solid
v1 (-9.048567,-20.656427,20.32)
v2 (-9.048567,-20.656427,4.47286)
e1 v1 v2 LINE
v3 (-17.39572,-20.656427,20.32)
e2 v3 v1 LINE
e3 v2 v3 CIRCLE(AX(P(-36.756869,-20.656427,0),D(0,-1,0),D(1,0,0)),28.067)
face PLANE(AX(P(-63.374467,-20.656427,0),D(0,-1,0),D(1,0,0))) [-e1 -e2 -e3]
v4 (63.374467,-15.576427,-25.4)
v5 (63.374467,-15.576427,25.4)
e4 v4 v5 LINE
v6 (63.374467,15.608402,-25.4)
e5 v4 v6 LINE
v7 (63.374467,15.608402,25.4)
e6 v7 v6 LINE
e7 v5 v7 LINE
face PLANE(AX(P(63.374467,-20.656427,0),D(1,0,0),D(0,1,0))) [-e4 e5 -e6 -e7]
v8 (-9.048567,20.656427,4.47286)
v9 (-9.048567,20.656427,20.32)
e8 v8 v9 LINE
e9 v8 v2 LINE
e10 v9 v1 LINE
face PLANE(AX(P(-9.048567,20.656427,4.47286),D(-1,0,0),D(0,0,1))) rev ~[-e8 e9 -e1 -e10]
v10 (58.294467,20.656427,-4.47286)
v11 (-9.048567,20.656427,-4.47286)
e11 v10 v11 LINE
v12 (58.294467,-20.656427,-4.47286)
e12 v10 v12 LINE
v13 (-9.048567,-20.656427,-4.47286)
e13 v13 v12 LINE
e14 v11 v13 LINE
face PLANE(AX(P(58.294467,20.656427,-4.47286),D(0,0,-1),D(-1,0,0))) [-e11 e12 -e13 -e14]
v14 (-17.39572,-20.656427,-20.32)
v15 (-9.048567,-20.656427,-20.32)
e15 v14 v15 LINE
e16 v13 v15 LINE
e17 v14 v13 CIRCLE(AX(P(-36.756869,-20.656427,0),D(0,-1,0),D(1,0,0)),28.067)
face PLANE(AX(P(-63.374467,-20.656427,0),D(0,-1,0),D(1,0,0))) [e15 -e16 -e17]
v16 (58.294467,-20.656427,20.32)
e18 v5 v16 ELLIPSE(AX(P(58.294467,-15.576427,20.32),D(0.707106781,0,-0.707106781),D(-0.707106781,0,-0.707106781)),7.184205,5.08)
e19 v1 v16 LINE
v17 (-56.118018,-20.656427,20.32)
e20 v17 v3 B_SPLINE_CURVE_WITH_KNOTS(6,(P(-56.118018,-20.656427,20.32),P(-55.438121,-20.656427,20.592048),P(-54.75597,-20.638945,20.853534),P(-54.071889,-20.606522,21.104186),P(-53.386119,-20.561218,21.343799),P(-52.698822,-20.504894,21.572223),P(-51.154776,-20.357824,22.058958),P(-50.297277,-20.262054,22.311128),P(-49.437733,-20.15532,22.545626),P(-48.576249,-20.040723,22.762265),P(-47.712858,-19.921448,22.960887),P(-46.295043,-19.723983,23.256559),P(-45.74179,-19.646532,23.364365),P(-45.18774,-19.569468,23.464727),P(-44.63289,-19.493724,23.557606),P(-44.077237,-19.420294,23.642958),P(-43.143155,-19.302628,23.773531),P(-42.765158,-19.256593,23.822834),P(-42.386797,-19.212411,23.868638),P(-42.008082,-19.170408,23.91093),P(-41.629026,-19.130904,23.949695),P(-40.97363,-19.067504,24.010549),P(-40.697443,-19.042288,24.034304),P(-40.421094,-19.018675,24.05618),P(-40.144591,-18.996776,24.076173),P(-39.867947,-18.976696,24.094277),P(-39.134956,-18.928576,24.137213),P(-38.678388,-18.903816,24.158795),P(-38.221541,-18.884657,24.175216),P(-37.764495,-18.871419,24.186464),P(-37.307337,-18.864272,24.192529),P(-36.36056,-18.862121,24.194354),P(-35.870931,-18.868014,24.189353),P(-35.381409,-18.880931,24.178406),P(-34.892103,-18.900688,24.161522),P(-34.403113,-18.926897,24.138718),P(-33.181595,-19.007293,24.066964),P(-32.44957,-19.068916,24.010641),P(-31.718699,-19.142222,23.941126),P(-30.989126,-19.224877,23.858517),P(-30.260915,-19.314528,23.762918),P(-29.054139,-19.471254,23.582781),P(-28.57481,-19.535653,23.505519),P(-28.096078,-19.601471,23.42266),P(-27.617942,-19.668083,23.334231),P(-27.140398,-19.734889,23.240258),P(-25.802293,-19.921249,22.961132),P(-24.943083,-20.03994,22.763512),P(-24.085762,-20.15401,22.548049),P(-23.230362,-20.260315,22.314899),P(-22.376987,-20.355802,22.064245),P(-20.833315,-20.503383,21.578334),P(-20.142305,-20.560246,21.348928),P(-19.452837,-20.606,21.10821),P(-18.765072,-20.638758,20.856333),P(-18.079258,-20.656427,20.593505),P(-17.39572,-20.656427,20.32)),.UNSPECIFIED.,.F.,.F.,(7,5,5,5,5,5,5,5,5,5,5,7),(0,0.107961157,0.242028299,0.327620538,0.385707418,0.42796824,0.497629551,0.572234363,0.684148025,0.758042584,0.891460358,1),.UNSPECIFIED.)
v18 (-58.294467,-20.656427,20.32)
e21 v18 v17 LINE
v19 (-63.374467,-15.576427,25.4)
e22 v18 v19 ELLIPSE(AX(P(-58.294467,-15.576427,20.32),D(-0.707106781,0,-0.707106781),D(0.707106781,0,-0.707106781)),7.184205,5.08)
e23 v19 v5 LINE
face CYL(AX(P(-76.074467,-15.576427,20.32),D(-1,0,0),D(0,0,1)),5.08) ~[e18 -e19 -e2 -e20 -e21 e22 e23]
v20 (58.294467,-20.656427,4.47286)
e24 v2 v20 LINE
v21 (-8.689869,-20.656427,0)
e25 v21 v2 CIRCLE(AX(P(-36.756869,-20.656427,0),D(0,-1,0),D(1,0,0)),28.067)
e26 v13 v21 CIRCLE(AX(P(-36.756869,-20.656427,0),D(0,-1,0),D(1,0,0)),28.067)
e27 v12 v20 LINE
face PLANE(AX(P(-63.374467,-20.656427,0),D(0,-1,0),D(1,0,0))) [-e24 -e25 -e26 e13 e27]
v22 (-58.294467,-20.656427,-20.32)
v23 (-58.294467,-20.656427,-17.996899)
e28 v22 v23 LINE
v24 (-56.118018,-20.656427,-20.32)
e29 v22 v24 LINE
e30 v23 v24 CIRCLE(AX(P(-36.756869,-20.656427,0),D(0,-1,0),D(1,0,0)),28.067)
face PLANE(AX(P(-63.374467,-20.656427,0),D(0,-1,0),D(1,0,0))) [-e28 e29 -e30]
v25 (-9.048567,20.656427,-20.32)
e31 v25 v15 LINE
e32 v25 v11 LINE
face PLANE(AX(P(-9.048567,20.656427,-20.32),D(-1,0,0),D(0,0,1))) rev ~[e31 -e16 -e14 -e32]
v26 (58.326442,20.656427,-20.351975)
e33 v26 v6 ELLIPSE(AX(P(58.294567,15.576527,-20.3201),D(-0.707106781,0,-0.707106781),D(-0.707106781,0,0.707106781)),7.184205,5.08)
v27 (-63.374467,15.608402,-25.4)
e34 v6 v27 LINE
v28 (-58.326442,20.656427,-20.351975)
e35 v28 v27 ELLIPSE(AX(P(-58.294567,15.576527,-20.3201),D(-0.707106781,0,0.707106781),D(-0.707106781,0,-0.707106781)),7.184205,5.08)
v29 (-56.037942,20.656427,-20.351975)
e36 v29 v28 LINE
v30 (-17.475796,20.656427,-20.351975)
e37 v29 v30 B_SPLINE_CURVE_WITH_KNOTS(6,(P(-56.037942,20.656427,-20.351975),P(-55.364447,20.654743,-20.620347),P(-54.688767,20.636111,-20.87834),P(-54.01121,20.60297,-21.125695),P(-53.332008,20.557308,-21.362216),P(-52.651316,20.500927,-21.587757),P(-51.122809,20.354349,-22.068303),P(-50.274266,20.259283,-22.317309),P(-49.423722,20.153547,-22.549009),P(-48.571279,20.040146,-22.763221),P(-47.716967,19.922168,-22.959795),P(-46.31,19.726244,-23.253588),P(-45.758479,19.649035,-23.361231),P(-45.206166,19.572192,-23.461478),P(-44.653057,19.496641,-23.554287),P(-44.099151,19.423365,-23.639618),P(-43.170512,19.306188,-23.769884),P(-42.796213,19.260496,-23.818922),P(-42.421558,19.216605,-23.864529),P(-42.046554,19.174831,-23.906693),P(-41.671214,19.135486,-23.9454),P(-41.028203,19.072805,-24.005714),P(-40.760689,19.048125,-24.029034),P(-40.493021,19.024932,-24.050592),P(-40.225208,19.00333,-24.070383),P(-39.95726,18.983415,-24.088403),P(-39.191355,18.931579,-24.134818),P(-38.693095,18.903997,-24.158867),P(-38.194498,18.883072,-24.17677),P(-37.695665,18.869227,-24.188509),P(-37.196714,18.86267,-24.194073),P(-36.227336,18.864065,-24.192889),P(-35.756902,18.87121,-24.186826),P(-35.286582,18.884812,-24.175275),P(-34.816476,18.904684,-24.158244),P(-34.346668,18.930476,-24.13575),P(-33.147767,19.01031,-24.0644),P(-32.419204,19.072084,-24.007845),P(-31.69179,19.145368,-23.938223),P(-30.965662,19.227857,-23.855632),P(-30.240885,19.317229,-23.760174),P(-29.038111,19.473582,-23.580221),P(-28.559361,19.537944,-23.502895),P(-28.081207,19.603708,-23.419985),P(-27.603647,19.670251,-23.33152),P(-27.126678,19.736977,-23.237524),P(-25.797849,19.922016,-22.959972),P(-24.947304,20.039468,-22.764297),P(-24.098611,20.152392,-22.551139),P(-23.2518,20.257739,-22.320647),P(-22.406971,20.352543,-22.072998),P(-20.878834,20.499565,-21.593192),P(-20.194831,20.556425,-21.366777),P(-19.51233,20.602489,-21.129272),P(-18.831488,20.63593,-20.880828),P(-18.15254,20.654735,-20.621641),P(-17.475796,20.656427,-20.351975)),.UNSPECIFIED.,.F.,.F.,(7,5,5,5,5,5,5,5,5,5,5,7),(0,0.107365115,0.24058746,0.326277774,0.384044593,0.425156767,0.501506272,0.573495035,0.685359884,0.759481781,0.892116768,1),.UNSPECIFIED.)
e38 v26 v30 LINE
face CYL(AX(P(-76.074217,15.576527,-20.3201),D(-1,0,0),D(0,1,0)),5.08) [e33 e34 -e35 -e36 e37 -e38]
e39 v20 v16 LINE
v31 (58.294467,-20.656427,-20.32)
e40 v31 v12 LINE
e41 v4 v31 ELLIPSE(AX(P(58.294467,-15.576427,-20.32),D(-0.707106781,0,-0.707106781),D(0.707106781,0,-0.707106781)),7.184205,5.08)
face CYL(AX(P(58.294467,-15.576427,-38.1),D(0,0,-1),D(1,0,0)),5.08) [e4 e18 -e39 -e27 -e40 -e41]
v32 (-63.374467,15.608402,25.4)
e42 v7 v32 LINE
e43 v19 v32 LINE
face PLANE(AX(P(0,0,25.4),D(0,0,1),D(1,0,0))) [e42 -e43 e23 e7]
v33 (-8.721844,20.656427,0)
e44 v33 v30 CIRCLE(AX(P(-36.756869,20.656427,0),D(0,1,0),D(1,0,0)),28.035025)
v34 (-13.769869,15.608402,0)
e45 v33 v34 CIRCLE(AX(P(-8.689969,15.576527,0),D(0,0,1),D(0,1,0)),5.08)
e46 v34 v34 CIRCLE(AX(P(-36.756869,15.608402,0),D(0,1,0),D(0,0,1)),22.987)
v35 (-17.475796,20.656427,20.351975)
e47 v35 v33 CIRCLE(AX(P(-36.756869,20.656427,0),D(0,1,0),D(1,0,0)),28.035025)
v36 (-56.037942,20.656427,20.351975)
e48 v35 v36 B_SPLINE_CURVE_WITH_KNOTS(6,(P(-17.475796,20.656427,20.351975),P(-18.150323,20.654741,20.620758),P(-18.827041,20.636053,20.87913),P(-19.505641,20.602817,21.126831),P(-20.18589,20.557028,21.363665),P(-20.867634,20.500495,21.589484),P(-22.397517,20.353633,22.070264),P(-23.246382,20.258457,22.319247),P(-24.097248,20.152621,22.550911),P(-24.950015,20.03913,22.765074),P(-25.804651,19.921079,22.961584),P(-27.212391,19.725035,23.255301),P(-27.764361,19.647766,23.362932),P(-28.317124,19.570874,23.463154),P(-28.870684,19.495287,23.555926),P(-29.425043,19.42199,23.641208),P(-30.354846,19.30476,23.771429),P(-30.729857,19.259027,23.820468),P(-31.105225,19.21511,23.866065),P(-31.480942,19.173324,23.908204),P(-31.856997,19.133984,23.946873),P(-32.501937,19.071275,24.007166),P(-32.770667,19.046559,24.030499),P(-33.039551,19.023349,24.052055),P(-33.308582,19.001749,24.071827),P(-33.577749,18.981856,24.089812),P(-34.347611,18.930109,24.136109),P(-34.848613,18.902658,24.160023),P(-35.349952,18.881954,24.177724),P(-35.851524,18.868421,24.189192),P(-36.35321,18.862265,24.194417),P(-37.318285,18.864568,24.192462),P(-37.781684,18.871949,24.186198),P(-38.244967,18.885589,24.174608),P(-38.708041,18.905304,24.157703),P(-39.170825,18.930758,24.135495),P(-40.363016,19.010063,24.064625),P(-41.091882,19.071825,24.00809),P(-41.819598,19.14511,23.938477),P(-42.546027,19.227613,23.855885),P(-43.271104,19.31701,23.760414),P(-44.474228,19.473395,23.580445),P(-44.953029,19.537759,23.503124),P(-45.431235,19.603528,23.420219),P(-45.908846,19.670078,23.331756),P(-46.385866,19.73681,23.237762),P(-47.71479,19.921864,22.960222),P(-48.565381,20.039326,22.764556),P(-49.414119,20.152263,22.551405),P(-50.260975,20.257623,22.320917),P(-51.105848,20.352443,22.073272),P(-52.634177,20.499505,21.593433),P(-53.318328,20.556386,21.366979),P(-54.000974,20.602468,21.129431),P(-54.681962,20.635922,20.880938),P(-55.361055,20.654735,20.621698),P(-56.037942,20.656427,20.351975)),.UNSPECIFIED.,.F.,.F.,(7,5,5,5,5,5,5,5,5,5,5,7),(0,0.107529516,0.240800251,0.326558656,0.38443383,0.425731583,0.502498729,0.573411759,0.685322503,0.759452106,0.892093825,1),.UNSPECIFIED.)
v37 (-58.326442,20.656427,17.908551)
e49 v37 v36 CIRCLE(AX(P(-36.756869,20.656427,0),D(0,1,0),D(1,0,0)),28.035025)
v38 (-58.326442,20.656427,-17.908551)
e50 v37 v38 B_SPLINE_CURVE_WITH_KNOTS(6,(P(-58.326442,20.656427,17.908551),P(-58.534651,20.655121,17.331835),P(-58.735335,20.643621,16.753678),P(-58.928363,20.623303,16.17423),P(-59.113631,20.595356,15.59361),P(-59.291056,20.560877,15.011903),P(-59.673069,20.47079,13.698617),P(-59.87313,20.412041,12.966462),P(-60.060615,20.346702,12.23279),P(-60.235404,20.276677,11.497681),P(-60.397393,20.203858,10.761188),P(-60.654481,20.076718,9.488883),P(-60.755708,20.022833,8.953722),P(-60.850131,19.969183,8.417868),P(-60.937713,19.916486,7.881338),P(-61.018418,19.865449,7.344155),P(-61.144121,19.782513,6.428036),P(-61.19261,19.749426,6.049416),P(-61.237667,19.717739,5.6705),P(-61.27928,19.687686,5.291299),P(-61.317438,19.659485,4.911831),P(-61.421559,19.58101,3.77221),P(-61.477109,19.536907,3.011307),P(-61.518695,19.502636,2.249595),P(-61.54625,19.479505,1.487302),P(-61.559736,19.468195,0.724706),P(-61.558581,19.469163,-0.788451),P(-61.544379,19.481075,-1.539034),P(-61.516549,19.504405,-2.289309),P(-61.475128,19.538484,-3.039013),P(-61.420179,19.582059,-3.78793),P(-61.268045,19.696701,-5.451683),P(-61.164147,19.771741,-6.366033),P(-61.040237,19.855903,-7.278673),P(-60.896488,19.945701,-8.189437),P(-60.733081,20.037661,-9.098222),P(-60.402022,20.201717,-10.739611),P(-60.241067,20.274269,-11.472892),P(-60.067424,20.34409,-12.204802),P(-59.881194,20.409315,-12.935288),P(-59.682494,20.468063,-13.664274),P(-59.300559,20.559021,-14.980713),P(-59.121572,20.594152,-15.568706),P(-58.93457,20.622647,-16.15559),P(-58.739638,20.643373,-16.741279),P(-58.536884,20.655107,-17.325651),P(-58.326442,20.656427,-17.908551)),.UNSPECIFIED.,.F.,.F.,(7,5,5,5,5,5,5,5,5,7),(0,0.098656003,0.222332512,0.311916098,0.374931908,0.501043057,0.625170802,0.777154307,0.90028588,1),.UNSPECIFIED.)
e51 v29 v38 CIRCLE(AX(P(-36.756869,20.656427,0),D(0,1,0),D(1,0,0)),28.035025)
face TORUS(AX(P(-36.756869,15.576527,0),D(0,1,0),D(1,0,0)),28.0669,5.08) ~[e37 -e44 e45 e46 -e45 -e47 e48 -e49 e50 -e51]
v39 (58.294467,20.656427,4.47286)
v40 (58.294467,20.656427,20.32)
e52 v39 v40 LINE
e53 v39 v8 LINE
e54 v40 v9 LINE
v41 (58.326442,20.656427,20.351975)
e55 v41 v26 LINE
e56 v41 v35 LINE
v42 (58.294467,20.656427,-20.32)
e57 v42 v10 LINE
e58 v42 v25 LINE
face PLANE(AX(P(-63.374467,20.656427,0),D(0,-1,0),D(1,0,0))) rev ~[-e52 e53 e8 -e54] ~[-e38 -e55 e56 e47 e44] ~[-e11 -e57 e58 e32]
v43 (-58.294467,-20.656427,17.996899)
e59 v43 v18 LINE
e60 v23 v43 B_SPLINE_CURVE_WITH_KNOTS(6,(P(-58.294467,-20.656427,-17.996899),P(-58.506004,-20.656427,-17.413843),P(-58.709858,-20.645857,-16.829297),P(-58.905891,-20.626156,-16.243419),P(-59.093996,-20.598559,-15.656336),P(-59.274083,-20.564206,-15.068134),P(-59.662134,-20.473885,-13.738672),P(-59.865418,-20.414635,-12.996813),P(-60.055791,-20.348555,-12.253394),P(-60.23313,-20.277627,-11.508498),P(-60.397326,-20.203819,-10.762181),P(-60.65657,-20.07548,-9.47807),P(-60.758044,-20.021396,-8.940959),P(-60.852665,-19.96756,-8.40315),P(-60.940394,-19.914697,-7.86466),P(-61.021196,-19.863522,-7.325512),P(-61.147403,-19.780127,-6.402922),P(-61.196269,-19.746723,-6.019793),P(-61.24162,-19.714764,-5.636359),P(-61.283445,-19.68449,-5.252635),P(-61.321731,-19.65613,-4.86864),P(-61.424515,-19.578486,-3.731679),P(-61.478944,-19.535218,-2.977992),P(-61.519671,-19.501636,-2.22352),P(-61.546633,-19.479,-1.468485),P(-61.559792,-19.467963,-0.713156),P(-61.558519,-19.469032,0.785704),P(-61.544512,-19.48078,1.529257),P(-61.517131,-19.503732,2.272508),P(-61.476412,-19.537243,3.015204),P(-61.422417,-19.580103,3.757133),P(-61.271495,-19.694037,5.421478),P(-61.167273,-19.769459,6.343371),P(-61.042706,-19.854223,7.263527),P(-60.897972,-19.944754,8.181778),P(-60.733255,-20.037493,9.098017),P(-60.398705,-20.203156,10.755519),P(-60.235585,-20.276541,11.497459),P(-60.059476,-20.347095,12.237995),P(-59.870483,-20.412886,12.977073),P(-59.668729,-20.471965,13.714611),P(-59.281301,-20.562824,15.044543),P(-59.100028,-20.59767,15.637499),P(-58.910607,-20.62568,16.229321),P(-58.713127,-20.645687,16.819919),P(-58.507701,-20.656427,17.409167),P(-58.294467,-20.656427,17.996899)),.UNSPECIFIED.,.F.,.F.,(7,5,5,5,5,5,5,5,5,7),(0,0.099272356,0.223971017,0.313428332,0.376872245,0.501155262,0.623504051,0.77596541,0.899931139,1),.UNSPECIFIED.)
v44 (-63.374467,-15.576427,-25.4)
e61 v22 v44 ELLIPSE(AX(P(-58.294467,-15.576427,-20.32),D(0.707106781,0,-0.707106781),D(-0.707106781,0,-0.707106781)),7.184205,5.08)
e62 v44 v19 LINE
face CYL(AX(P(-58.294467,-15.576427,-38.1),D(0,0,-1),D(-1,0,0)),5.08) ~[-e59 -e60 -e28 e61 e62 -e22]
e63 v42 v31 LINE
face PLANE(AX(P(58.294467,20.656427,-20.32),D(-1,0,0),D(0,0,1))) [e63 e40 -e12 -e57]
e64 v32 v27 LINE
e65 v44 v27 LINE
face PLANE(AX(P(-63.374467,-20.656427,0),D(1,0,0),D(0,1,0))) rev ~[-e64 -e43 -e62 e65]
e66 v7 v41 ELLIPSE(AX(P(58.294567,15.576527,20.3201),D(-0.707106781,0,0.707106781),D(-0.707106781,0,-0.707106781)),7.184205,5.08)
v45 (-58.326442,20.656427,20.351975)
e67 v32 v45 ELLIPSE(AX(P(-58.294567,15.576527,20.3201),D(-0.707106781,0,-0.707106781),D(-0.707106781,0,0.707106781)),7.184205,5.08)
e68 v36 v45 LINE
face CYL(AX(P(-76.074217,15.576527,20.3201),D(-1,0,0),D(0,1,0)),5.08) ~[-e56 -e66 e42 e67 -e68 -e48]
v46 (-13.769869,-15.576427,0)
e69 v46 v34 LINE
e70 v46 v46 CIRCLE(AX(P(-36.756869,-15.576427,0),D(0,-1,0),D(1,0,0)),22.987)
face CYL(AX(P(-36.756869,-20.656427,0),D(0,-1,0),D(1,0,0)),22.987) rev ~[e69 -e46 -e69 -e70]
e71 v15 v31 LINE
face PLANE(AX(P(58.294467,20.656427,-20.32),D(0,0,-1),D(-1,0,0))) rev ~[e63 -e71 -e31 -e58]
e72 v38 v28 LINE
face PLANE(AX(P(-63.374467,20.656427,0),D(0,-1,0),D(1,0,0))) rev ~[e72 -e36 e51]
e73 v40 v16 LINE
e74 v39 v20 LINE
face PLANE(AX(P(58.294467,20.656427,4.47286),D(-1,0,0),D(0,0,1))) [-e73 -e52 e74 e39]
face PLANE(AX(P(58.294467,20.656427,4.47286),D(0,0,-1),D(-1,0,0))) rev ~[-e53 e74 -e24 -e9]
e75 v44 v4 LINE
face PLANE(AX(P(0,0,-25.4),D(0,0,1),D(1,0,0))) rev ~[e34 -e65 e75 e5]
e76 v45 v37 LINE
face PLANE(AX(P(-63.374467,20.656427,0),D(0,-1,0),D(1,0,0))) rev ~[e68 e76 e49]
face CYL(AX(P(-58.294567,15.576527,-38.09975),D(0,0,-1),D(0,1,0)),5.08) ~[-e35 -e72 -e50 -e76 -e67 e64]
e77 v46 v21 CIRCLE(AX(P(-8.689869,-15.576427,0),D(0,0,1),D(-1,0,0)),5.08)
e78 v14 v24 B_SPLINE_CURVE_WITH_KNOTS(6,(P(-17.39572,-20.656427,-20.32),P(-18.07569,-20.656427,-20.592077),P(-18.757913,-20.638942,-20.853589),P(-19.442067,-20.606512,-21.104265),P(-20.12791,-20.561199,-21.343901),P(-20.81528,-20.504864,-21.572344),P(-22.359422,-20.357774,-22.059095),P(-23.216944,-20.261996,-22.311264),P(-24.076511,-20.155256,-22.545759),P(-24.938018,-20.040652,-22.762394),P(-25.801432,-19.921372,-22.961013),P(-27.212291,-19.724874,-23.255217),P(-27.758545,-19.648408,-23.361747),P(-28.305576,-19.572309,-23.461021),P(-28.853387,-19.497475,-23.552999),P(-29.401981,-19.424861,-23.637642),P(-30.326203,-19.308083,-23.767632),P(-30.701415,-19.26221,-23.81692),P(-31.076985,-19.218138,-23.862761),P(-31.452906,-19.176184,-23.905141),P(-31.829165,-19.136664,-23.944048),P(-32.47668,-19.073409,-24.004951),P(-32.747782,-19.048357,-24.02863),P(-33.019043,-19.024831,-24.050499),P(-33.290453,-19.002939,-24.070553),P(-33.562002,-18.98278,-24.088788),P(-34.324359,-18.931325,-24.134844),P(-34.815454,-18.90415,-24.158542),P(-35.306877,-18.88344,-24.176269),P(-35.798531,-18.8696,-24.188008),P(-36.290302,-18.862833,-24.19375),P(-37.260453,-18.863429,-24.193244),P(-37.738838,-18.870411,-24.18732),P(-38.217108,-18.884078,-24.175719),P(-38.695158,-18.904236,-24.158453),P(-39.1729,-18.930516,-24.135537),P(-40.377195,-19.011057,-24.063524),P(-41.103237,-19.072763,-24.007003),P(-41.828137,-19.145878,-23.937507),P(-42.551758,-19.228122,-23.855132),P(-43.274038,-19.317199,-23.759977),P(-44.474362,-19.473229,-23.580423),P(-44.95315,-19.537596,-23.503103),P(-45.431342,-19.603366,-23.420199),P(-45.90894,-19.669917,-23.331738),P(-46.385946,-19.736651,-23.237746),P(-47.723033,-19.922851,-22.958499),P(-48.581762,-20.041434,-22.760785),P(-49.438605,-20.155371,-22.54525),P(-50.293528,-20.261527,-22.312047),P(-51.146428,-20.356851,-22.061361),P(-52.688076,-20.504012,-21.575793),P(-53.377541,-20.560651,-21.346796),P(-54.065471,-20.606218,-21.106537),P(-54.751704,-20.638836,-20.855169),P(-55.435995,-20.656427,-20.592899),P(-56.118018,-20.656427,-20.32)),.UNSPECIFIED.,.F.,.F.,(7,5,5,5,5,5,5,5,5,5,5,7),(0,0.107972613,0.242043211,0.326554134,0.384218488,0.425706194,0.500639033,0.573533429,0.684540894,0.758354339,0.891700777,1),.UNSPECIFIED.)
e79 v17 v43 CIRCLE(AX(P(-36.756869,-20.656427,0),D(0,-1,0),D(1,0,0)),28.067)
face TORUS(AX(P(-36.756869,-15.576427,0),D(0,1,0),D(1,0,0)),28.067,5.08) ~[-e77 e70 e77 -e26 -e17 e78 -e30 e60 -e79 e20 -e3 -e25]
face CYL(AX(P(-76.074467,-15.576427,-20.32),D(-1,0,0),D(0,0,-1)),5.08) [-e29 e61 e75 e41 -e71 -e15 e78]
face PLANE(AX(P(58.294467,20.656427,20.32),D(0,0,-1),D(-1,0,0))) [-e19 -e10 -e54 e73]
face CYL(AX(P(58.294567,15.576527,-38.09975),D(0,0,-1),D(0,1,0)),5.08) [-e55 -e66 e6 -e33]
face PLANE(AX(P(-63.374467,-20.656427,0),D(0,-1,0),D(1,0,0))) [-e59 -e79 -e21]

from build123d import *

# Parameters (mm, degrees)
F0_W        = 126.7489343882
F0_H        = 41.312854737
F1_DEPTH    = 25.4
F2_R        = 22.987
F3_DEPTH    = 41.313854737
F4_T1_DEPTH = 76.2
F4_T3_DEPTH = 152.1489343882
F5_T1_DEPTH = 152.1484343931
F5_T3_DEPTH = 76.1995000049
F6_W        = 67.343034428
F6_H        = 15.8471396435
F7_DEPTH    = 41.313854837


# Not quite as in the source:
# - a fillet or chamfer that OpenCascade refuses, or shapes differently, is made with other operations: its cross-section is extruded or revolved along the edge and cut away or added


with BuildPart() as f1:
    # F0 (on Top) → F1 (new body, symmetric)
    with BuildSketch(Plane.XY):
        Rectangle(F0_W, F0_H)
    extrude(amount=F1_DEPTH, both=True)

    # F2 (on face) → F3 (cut, through all)
    with BuildSketch(Plane.XZ.offset(20.6564273685)):
        with Locations((-36.7568694055, 0)):
            Circle(F2_R)
    extrude(amount=-F3_DEPTH, mode=Mode.SUBTRACT)

    # F4: fillet of radius 5.08 on 5 edges, made by hand

    # F4_s2 → F4_t1 (cut)
    with BuildSketch(Plane.XY.offset(-38.1)):
        with BuildLine():
            ThreePointArc((-63.3744671941, -15.5764273685), (-61.8865696425, -19.1685298169), (-58.2944671941, -20.6564273685))
            Line((-58.2944671941, -20.6564273685), (-63.3744671941, -20.6564273685))
            Line((-63.3744671941, -20.6564273685), (-63.3744671941, -15.5764273685))
        make_face()
        with BuildLine():
            ThreePointArc((63.3744671941, -15.5764273685), (61.8865696425, -19.1685298169), (58.2944671941, -20.6564273685))
            Line((58.2944671941, -20.6564273685), (63.3744671941, -20.6564273685))
            Line((63.3744671941, -20.6564273685), (63.3744671941, -15.5764273685))
        make_face()
    extrude(amount=F4_T1_DEPTH, mode=Mode.SUBTRACT)

    # F4_s4 → F4_t3 (cut)
    with BuildSketch(Plane.YZ.offset(-76.0744671941)):
        with BuildLine():
            ThreePointArc((-15.5764273685, -25.4), (-19.1685298169, -23.9121024484), (-20.6564273685, -20.32))
            Line((-20.6564273685, -20.32), (-20.6564273685, -25.4))
            Line((-20.6564273685, -25.4), (-15.5764273685, -25.4))
        make_face()
        with BuildLine():
            ThreePointArc((-15.5764273685, 25.4), (-19.1685298169, 23.9121024484), (-20.6564273685, 20.32))
            Line((-20.6564273685, 20.32), (-20.6564273685, 25.4))
            Line((-20.6564273685, 25.4), (-15.5764273685, 25.4))
        make_face()
    extrude(amount=F4_T3_DEPTH, mode=Mode.SUBTRACT)

    # F4_s5 → F4_t6 (revolve, cut)
    with BuildSketch(Plane.XY):
        with BuildLine():
            ThreePointArc((-13.7698694055, -15.5764273685), (-12.2819718539, -19.1685298169), (-8.6898694055, -20.6564273685))
            Line((-8.6898694055, -20.6564273685), (-13.7698694055, -20.6564273685))
            Line((-13.7698694055, -20.6564273685), (-13.7698694055, -15.5764273685))
        make_face()
    revolve(axis=Axis((-36.7568694055, -20.6564273685, 0), (0, -1, 0)), mode=Mode.SUBTRACT)

    # F5: fillet of radius 5.08 on 5 edges, made by hand

    # F5_s2 → F5_t1 (cut)
    with BuildSketch(Plane.YZ.offset(-76.0742171965)):
        with BuildLine():
            ThreePointArc((20.6565273685, -20.3201), (19.1686298169, -23.9122024484), (15.5765273685, -25.4001))
            Line((15.5765273685, -25.4001), (15.5765273685, -25.5017))
            ThreePointArc((15.5765273685, -25.5017), (18.1164773685, -25.5016), (20.6564273685, -25.5016))
            Line((20.6564273685, -25.5016), (20.7580273685, -25.4))
            ThreePointArc((20.7580273685, -25.4), (20.7580273685, -22.86005), (20.7581273685, -20.3201))
            Line((20.7581273685, -20.3201), (20.6565273685, -20.3201))
        make_face()
        with BuildLine():
            ThreePointArc((20.6565273685, 20.3201), (19.1686298169, 23.9122024484), (15.5765273685, 25.4001))
            Line((15.5765273685, 25.4001), (15.5765273685, 25.5017))
            ThreePointArc((15.5765273685, 25.5017), (18.1164773685, 25.5016), (20.6564273685, 25.5016))
            Line((20.6564273685, 25.5016), (20.7580273685, 25.4))
            ThreePointArc((20.7580273685, 25.4), (20.7580273685, 22.86005), (20.7581273685, 20.3201))
            Line((20.7581273685, 20.3201), (20.6565273685, 20.3201))
        make_face()
    extrude(amount=F5_T1_DEPTH, mode=Mode.SUBTRACT)

    # F5_s4 → F5_t3 (cut)
    with BuildSketch(Plane.XY.offset(-38.0997500025)):
        with BuildLine():
            ThreePointArc((58.2945671941, 20.6565273685), (61.8866696425, 19.1686298169), (63.3745671941, 15.5765273685))
            Line((63.3745671941, 15.5765273685), (63.4761671941, 15.5765273685))
            ThreePointArc((63.4761671941, 15.5765273685), (63.4760671941, 18.1164773685), (63.4760671941, 20.6564273685))
            Line((63.4760671941, 20.6564273685), (63.3744671941, 20.7580273685))
            ThreePointArc((63.3744671941, 20.7580273685), (60.8345171941, 20.7580273685), (58.2945671941, 20.7581273685))
            Line((58.2945671941, 20.7581273685), (58.2945671941, 20.6565273685))
        make_face()
        with BuildLine():
            ThreePointArc((-58.2945671941, 20.6565273685), (-61.8866696425, 19.1686298169), (-63.3745671941, 15.5765273685))
            Line((-63.3745671941, 15.5765273685), (-63.4761671941, 15.5765273685))
            ThreePointArc((-63.4761671941, 15.5765273685), (-63.4760671941, 18.1164773685), (-63.4760671941, 20.6564273685))
            Line((-63.4760671941, 20.6564273685), (-63.3744671941, 20.7580273685))
            ThreePointArc((-63.3744671941, 20.7580273685), (-60.8345171941, 20.7580273685), (-58.2945671941, 20.7581273685))
            Line((-58.2945671941, 20.7581273685), (-58.2945671941, 20.6565273685))
        make_face()
    extrude(amount=F5_T3_DEPTH, mode=Mode.SUBTRACT)

    # F5_s5 → F5_t6 (revolve, cut)
    with BuildSketch(Plane.XY):
        with BuildLine():
            ThreePointArc((-8.6899694055, 20.6565273685), (-12.2820718539, 19.1686298169), (-13.7699694055, 15.5765273685))
            Line((-13.7699694055, 15.5765273685), (-13.8715694055, 15.5765273685))
            ThreePointArc((-13.8715694055, 15.5765273685), (-13.8714694055, 18.1164773685), (-13.8714694055, 20.6564273685))
            Line((-13.8714694055, 20.6564273685), (-13.7698694055, 20.7580273685))
            ThreePointArc((-13.7698694055, 20.7580273685), (-11.2299194055, 20.7580273685), (-8.6899694055, 20.7581273685))
            Line((-8.6899694055, 20.7581273685), (-8.6899694055, 20.6565273685))
        make_face()
    revolve(axis=Axis((-36.7568694055, 20.6564273685, 0), (0, -1, 0)), mode=Mode.SUBTRACT)

    # F6 (on face) → F7 (cut, through all)
    with BuildSketch(Plane(origin=(0, 20.6564273685, 0), x_dir=(-1, 0, 0), z_dir=(0, 1, 0))):
        with Locations((-24.6229499801, -12.3964301783)):
            Rectangle(F6_W, F6_H)
        with Locations((-24.6229499801, 12.3964301783)):
            Rectangle(F6_W, F6_H)
    extrude(amount=-F7_DEPTH, mode=Mode.SUBTRACT)


solid = f1.part
